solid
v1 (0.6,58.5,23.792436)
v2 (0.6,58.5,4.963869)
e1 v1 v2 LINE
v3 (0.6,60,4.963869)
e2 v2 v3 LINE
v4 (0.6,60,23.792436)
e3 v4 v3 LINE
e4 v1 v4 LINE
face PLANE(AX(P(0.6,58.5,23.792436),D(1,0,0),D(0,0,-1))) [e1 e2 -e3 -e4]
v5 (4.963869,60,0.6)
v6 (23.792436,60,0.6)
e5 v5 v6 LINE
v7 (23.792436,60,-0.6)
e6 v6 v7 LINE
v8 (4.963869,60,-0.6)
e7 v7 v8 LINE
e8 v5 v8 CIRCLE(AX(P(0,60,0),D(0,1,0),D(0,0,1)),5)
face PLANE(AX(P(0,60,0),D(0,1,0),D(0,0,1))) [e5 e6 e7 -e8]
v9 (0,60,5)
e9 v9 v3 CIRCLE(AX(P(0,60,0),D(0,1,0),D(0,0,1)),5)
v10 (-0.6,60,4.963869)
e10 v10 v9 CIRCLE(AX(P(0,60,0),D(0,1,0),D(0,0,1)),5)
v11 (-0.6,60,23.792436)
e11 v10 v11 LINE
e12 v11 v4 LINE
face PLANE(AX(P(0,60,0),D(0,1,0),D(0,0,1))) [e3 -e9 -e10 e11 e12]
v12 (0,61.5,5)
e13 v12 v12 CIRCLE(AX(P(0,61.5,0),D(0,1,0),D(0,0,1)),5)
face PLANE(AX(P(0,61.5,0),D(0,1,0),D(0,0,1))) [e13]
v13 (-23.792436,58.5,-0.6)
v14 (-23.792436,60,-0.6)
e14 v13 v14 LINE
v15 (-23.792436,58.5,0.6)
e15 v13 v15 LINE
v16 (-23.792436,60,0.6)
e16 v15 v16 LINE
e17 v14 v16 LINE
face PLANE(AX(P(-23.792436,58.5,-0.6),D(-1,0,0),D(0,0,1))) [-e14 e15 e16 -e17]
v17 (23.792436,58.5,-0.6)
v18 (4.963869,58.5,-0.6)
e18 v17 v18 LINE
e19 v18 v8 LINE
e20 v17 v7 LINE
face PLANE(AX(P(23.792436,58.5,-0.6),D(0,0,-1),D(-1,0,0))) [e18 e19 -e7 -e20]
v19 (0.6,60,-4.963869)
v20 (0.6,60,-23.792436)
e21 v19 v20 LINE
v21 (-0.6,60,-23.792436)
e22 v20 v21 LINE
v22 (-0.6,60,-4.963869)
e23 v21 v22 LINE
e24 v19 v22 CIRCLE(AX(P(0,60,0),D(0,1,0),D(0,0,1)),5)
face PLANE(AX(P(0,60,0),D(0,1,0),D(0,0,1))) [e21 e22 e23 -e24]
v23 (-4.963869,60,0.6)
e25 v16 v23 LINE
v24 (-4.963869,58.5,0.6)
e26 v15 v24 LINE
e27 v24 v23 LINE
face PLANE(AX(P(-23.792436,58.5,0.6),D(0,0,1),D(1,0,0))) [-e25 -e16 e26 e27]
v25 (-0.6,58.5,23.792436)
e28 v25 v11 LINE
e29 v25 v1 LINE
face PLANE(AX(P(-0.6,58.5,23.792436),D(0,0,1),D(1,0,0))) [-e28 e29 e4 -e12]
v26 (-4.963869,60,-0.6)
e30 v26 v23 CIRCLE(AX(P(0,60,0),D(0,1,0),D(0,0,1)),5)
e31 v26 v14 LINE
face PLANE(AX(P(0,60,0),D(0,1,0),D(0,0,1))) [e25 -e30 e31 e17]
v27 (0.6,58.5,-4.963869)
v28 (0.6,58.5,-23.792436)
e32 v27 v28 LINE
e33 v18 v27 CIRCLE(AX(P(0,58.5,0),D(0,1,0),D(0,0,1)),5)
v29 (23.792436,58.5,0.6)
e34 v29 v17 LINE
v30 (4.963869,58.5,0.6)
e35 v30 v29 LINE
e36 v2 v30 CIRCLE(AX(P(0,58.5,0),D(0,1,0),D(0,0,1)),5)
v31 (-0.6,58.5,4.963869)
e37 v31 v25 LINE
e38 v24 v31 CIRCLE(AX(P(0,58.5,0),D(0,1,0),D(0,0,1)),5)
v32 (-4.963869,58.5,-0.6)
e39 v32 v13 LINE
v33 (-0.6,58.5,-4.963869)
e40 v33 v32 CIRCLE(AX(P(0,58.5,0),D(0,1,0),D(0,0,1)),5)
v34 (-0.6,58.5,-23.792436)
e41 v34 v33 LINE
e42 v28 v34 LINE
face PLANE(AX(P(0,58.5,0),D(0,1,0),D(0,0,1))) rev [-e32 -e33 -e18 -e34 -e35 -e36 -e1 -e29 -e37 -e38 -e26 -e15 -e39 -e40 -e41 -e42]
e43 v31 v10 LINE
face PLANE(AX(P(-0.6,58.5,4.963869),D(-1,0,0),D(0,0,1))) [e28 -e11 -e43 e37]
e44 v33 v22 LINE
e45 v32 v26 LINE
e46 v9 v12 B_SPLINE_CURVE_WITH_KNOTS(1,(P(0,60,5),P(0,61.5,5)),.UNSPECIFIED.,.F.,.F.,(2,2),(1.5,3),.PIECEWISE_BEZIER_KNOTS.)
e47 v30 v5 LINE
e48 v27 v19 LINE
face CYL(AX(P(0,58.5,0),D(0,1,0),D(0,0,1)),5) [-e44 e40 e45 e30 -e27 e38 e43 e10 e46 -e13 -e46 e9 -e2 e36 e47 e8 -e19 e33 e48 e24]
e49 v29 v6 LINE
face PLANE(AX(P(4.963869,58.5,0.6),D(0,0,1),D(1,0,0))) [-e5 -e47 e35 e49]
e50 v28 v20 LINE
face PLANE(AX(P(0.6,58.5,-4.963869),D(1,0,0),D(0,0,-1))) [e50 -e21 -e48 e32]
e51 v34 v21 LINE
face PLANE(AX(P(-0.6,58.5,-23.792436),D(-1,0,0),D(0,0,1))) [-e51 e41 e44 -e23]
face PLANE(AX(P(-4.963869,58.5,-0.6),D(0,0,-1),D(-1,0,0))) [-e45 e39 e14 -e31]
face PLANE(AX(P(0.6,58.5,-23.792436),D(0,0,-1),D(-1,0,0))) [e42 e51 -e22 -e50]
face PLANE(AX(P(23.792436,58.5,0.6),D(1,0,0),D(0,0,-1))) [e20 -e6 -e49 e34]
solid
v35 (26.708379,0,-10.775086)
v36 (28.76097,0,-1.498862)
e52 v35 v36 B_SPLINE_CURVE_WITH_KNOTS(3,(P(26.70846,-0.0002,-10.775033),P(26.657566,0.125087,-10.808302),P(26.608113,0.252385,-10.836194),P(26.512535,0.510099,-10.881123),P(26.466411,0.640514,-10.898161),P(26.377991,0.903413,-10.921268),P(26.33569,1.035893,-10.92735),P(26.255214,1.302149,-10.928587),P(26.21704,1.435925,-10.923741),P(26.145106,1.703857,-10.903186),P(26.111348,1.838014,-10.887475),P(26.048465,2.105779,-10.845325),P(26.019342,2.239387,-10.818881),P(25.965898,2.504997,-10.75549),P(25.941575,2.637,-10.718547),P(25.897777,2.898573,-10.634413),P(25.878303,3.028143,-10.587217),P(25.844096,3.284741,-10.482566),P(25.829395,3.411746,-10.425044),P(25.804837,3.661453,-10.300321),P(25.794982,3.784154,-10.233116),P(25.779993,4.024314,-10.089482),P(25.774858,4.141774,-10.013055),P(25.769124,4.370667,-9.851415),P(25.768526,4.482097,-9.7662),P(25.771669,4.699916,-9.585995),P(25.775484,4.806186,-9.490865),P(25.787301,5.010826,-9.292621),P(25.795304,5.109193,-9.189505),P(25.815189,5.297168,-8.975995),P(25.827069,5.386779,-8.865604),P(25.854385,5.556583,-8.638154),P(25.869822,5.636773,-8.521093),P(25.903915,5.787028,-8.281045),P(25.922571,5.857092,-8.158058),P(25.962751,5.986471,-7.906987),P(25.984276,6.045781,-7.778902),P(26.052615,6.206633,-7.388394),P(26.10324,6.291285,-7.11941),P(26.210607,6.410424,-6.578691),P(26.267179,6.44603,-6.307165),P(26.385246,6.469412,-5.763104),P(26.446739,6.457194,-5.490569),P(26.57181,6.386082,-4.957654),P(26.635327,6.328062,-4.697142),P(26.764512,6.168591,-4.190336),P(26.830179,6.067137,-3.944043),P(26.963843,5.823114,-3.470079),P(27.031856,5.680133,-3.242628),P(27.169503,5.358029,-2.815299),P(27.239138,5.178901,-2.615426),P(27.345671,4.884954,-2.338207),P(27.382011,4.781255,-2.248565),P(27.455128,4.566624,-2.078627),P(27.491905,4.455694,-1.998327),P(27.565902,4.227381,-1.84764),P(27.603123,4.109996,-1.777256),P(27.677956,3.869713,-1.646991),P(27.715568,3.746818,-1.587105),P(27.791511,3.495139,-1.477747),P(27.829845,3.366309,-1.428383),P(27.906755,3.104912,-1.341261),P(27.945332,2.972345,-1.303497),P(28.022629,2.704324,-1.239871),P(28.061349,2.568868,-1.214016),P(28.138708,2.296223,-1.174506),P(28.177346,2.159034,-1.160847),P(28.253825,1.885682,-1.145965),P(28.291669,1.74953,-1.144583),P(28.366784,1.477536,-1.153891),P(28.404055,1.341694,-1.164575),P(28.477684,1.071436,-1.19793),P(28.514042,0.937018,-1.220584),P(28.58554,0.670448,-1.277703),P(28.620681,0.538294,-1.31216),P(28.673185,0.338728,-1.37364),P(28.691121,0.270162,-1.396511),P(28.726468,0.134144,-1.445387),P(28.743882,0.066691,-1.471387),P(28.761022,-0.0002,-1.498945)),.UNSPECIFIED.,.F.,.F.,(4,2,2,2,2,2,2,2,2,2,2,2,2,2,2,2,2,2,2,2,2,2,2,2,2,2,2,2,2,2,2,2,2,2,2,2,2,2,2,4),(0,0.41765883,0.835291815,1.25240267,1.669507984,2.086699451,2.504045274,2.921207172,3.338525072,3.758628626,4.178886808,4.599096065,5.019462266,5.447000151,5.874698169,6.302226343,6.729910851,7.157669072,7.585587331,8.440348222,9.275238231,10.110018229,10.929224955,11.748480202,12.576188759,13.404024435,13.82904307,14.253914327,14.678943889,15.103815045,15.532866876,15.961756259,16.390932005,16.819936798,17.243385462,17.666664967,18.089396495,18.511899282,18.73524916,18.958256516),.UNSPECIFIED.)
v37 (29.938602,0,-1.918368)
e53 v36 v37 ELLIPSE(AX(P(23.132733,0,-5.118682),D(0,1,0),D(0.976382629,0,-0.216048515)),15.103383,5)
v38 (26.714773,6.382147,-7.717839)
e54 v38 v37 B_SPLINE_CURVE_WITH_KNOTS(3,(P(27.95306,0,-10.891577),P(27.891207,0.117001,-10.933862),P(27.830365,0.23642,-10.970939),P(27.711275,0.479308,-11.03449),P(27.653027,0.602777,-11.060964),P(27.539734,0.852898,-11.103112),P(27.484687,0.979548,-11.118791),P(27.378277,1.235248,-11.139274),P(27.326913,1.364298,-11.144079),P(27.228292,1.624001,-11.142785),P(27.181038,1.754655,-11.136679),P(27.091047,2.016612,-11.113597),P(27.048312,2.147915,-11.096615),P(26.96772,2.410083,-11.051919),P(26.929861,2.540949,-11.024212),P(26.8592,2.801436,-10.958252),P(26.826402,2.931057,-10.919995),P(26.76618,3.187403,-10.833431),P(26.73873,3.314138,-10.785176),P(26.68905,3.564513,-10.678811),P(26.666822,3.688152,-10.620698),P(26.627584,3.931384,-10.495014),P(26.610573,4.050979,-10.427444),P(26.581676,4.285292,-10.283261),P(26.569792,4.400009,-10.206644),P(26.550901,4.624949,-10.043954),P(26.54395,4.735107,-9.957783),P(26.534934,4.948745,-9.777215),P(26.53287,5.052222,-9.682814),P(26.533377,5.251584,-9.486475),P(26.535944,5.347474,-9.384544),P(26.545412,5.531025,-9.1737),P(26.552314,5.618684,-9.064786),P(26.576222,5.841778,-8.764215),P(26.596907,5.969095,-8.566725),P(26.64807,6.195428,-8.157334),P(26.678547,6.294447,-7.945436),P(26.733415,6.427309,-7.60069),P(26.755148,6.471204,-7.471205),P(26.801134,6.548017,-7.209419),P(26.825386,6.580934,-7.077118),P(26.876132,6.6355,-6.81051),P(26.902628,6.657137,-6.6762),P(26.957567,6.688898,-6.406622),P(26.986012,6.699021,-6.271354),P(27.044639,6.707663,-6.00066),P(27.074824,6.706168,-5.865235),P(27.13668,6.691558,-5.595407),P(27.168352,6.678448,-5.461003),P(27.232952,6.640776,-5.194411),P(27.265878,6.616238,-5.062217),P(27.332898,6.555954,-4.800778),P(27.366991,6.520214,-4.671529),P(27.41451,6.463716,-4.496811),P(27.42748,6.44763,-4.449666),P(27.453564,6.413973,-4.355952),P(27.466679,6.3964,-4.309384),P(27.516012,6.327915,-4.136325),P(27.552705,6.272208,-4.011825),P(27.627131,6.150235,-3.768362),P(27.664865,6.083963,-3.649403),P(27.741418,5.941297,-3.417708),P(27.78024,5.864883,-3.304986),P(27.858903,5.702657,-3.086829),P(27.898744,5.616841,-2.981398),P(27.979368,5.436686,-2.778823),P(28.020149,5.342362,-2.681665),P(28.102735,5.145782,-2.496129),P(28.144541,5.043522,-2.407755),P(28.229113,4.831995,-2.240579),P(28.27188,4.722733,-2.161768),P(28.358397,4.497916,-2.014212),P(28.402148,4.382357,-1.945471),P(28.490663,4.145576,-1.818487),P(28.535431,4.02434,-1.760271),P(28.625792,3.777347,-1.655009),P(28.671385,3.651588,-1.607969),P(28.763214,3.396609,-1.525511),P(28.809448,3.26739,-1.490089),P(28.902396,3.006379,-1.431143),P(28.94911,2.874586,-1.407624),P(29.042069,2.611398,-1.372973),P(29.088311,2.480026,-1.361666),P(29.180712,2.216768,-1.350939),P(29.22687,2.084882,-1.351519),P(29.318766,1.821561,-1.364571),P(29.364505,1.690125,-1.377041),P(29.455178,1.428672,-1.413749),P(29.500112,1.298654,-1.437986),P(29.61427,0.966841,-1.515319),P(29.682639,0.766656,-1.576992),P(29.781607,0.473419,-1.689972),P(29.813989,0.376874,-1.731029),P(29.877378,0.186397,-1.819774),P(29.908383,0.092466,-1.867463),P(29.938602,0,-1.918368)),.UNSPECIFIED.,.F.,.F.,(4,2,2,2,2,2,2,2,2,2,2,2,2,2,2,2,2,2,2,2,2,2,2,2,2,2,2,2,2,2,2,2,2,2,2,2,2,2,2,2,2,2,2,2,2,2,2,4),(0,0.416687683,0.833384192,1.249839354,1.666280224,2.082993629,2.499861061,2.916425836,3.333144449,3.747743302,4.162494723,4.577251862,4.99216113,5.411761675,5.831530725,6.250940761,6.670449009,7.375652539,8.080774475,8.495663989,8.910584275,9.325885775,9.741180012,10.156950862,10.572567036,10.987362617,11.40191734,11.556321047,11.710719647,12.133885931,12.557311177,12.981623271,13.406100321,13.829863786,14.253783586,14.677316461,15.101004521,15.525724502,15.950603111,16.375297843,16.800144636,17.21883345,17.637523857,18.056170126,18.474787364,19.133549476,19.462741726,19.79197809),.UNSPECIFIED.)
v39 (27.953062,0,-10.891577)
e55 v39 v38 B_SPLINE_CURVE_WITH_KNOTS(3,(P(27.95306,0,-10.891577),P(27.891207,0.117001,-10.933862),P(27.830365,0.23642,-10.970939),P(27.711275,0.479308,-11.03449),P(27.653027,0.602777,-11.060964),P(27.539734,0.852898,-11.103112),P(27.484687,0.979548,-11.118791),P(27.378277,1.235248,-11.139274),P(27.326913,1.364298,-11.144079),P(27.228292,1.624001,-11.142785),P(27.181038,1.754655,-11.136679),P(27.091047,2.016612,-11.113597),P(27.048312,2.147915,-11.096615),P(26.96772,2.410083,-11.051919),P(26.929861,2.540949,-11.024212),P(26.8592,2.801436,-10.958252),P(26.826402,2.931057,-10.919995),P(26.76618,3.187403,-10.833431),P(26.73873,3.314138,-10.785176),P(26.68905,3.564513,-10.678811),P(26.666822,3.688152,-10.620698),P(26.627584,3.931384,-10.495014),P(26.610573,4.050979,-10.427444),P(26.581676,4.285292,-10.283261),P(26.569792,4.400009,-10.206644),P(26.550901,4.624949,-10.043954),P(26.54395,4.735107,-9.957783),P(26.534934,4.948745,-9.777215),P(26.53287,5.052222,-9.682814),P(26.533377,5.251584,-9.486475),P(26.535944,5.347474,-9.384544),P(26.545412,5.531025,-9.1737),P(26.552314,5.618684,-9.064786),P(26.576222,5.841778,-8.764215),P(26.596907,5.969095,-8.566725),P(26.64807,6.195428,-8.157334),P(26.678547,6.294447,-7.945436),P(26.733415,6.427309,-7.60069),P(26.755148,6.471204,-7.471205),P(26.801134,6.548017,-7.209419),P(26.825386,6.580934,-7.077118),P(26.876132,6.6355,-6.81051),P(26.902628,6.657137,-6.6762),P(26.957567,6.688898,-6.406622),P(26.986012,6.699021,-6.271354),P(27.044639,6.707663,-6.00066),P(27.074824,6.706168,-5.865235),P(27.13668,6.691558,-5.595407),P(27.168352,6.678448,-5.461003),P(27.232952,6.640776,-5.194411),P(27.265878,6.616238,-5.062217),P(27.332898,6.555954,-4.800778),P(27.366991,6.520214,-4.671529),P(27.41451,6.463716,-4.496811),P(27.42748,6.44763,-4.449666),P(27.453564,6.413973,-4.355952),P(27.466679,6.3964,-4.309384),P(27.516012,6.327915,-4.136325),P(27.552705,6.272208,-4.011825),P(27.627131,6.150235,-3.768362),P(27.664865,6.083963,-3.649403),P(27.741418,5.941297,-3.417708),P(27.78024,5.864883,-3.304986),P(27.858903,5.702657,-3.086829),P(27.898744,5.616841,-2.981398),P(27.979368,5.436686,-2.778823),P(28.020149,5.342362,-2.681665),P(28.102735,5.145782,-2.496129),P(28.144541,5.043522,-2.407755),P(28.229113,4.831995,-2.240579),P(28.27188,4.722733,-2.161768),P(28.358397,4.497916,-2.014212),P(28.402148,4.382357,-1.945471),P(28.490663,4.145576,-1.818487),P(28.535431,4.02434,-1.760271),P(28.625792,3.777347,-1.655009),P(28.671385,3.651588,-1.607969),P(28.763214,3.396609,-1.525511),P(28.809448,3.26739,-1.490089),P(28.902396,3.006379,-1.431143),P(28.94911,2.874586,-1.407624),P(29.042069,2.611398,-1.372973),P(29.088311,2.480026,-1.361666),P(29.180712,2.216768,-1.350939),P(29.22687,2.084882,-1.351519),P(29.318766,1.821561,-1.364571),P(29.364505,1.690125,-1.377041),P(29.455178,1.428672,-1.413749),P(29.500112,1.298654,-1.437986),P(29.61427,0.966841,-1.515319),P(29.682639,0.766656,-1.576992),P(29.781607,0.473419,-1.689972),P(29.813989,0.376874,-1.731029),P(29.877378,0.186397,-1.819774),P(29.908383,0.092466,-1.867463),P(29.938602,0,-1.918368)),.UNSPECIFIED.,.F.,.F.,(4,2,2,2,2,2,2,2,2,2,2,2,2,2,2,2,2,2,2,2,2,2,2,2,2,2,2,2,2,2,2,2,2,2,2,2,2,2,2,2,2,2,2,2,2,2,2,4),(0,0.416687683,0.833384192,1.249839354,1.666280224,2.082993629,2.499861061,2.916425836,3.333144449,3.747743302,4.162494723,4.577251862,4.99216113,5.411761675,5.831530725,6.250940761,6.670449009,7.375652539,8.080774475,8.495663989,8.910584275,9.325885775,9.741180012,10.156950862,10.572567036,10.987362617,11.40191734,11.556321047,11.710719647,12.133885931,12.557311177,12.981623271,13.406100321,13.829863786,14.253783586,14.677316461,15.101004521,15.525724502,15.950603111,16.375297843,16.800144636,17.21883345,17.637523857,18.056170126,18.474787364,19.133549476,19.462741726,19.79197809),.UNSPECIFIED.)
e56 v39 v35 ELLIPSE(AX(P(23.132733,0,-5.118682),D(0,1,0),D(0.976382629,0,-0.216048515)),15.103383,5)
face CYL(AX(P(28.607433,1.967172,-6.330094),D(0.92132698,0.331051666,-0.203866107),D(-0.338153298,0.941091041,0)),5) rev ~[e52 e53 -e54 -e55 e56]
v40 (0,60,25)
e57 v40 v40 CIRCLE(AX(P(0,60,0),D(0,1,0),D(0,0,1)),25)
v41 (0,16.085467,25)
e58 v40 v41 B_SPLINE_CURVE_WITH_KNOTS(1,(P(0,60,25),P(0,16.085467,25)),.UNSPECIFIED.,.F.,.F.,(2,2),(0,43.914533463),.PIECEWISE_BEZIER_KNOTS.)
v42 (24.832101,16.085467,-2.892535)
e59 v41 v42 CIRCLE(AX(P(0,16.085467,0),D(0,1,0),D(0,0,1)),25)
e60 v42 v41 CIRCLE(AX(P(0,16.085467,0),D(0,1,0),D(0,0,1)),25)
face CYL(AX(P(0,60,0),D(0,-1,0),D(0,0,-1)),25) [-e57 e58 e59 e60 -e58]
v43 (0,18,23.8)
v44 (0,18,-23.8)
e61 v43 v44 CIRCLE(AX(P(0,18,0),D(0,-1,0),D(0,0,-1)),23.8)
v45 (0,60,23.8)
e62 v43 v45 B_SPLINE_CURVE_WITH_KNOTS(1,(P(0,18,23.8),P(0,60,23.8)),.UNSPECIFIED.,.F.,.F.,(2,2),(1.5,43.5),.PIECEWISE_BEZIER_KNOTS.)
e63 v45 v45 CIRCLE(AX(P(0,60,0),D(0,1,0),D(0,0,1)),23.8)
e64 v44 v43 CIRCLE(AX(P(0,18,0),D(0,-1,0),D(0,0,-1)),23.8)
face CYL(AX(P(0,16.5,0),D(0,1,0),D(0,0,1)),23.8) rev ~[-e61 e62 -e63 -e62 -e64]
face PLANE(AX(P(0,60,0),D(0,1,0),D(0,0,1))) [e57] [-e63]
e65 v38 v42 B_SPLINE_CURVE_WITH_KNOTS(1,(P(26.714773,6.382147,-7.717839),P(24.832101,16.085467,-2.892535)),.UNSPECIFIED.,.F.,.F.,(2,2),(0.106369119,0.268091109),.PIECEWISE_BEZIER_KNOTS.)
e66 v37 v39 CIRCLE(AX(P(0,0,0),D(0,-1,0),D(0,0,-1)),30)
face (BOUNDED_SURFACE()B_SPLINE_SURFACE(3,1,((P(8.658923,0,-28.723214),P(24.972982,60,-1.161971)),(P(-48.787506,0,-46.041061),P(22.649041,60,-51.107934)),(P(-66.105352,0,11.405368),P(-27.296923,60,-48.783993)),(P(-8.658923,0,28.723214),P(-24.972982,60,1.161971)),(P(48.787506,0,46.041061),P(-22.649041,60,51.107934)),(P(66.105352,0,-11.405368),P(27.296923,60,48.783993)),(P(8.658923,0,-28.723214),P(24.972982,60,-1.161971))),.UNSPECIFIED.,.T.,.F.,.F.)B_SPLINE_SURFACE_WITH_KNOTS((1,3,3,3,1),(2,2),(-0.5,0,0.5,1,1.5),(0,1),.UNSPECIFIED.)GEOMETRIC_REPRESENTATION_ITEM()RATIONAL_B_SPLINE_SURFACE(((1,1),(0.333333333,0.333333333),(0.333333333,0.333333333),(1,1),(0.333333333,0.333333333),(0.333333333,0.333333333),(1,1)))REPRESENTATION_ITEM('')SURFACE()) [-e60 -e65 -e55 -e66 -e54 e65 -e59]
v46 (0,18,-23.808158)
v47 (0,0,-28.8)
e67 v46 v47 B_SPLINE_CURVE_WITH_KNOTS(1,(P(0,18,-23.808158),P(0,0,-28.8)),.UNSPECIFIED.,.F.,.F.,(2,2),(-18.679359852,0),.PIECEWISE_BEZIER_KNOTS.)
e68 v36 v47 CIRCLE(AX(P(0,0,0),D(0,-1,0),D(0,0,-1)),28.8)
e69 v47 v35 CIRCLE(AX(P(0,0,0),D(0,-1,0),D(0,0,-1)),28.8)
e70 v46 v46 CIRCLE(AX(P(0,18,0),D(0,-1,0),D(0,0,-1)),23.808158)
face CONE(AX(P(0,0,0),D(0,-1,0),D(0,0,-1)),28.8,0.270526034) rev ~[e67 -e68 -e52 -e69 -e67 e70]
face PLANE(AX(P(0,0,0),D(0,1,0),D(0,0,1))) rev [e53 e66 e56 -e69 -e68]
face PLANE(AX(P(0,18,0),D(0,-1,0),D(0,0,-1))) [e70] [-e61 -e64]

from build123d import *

# Parameters (mm, degrees)
SKETCH1_R                  = 25
BOSS_EXTRUDE1_DEPTH        = 60
SKETCH3_R                  = 23.8
CUT_EXTRUDE1_DEPTH         = 43.5
SKETCH4_R                  = 28.8
CUT_EXTRUDE2_DEPTH         = 18
CUT_EXTRUDE2_DRAFT         = -15.5
BOSS_EXTRUDE2_DEPTH        = 1.5
SKETCH7_R                  = 5
BOSS_EXTRUDE3_DEPTH        = 1.5
F_10_0MM_START             = -28.308378884
F_10_0MM_DOWEL_HOLE2_DEPTH = 57.308378884


with BuildPart() as part:
    # Sketch1 → Boss-Extrude1 (new body)
    with BuildSketch(Plane(origin=(0, 0, 0), x_dir=(1, 0, 0), z_dir=(0, 1, 0))):
        with Locations(Location((0, 0, 0), (0, 0, 270))):
            Circle(SKETCH1_R)
    extrude(amount=BOSS_EXTRUDE1_DEPTH)

    # Loft1: read off the stored shape, not the designer's step
    # Loft1: loft between two sections, ruled curve by curve
    loft1_from = [
        Edge.make_bspline([(8.658923116, 0, -28.723214487), (-48.787505858, 0, -46.04106072), (-66.10535209, 0, 11.405368254), (-8.658923116, 0, 28.723214487), (48.787505858, 0, 46.04106072), (66.10535209, 0, -11.405368254), (8.658923116, 0, -28.723214487)], [0, 0, 0, 0, 0.5, 0.5, 0.5, 1, 1, 1, 1], 3, [1, 0.333333333, 0.333333333, 1, 0.333333333, 0.333333333, 1]),
    ]
    loft1_to = [
        Edge.make_bspline([(24.972981891, 60, -1.161970511), (22.649040869, 60, -51.107934293), (-27.296922913, 60, -48.783993271), (-24.972981891, 60, 1.161970511), (-22.649040869, 60, 51.107934293), (27.296922913, 60, 48.783993271), (24.972981891, 60, -1.161970511)], [0, 0, 0, 0, 0.5, 0.5, 0.5, 1, 1, 1, 1], 3, [1, 0.333333333, 0.333333333, 1, 0.333333333, 0.333333333, 1]),
    ]
    loft1 = Solid(Shell([*[Face.make_surface_from_curves(loft1_from[k], loft1_to[k]) for k in range(1)], Face(Wire(loft1_from)), Face(Wire(loft1_to))]))
    add(loft1)

    # Sketch3 → Cut-Extrude1 (cut)
    with BuildSketch(Plane(origin=(0, 60, 0), x_dir=(1, 0, 0), z_dir=(0, 1, 0))):
        with Locations(Location((0, 0, 0), (0, 0, 270))):
            Circle(SKETCH3_R)
    extrude(amount=-CUT_EXTRUDE1_DEPTH, mode=Mode.SUBTRACT)


with BuildPart() as cut_extrude2_tool:
    # Sketch4 → Cut-Extrude2 (with draft: the straight prism first)
    with BuildSketch(Plane.XZ):
        Circle(SKETCH4_R)
    extrude(amount=-CUT_EXTRUDE2_DEPTH)
    # Cut-Extrude2: the draft: its side faces are tilted about the plane it starts from
    cut_extrude2_sides = [cut_extrude2_tool.faces().sort_by_distance(p)[0] for p in [
        (-28.8, 9, 0),
    ]]
    draft(cut_extrude2_sides, Plane.XZ, CUT_EXTRUDE2_DRAFT)


with BuildPart() as part_1:
    add(part.part)

    # Cut-Extrude2: cut by cut_extrude2_tool
    add(cut_extrude2_tool.part, mode=Mode.SUBTRACT)

    # Ø10.0mm Dowel Hole2: read off the stored shape, not the designer's step
    # Ø10.0mm Dowel Hole2 outline → Ø10.0mm Dowel Hole2 (cut)
    with BuildSketch(Plane(origin=(0, 0, 0), x_dir=(-0.32323309601854383, 0.9436126294827636, 0.07152322083695323), z_dir=(0.9213269803701237, 0.33105166587803897, -0.20386610743682995)).offset(F_10_0MM_START)):
        with BuildLine():
            Line((-11, -4.086571585), (-9.814355471, -4.595129374))
            ThreePointArc((-9.814355471, -4.595129374), (-2.843369415, -4.13e-07), (-9.814354711, 4.5951297))
            Line((-9.814354711, 4.5951297), (-11, 4.086571817))
            Line((-11, 4.086571817), (-11, -4.086571585))
        make_face()
    extrude(amount=F_10_0MM_DOWEL_HOLE2_DEPTH, mode=Mode.SUBTRACT)


with BuildPart() as body_2:
    # Sketch6 → Boss-Extrude2 (new body)
    with BuildSketch(Plane(origin=(0, 60, 0), x_dir=(1, 0, 0), z_dir=(0, 1, 0))):
        with BuildLine():
            Line((-4.963869458, 0.6), (-23.792435773, 0.6))
            Line((-23.792435773, 0.6), (-23.792435773, -0.6))
            Line((-23.792435773, -0.6), (-4.963869458, -0.6))
            ThreePointArc((-4.963869458, -0.6), (-3.535533906, -3.535533906), (-0.6, -4.963869458))
            Line((-0.6, -4.963869458), (-0.6, -23.792435773))
            Line((-0.6, -23.792435773), (0.6, -23.792435773))
            Line((0.6, -23.792435773), (0.6, -4.963869458))
            ThreePointArc((0.6, -4.963869458), (3.535533906, -3.535533906), (4.963869458, -0.6))
            Line((4.963869458, -0.6), (23.792435773, -0.6))
            Line((23.792435773, -0.6), (23.792435773, 0.6))
            Line((23.792435773, 0.6), (4.963869458, 0.6))
            ThreePointArc((4.963869458, 0.6), (3.535533906, 3.535533906), (0.6, 4.963869458))
            Line((0.6, 4.963869458), (0.6, 23.792435773))
            Line((0.6, 23.792435773), (-0.6, 23.792435773))
            Line((-0.6, 23.792435773), (-0.6, 4.963869458))
            ThreePointArc((-0.6, 4.963869458), (-3.535533906, 3.535533906), (-4.963869458, 0.6))
        make_face()
    extrude(amount=-BOSS_EXTRUDE2_DEPTH)

    # Sketch7 → Boss-Extrude3 (add)
    with BuildSketch(Plane(origin=(0, 60, 0), x_dir=(1, 0, 0), z_dir=(0, 1, 0))):
        with Locations(Location((0, 0, 0), (0, 0, 270))):
            Circle(SKETCH7_R)
    extrude(amount=BOSS_EXTRUDE3_DEPTH)


solid = Compound([part_1.part, body_2.part])
